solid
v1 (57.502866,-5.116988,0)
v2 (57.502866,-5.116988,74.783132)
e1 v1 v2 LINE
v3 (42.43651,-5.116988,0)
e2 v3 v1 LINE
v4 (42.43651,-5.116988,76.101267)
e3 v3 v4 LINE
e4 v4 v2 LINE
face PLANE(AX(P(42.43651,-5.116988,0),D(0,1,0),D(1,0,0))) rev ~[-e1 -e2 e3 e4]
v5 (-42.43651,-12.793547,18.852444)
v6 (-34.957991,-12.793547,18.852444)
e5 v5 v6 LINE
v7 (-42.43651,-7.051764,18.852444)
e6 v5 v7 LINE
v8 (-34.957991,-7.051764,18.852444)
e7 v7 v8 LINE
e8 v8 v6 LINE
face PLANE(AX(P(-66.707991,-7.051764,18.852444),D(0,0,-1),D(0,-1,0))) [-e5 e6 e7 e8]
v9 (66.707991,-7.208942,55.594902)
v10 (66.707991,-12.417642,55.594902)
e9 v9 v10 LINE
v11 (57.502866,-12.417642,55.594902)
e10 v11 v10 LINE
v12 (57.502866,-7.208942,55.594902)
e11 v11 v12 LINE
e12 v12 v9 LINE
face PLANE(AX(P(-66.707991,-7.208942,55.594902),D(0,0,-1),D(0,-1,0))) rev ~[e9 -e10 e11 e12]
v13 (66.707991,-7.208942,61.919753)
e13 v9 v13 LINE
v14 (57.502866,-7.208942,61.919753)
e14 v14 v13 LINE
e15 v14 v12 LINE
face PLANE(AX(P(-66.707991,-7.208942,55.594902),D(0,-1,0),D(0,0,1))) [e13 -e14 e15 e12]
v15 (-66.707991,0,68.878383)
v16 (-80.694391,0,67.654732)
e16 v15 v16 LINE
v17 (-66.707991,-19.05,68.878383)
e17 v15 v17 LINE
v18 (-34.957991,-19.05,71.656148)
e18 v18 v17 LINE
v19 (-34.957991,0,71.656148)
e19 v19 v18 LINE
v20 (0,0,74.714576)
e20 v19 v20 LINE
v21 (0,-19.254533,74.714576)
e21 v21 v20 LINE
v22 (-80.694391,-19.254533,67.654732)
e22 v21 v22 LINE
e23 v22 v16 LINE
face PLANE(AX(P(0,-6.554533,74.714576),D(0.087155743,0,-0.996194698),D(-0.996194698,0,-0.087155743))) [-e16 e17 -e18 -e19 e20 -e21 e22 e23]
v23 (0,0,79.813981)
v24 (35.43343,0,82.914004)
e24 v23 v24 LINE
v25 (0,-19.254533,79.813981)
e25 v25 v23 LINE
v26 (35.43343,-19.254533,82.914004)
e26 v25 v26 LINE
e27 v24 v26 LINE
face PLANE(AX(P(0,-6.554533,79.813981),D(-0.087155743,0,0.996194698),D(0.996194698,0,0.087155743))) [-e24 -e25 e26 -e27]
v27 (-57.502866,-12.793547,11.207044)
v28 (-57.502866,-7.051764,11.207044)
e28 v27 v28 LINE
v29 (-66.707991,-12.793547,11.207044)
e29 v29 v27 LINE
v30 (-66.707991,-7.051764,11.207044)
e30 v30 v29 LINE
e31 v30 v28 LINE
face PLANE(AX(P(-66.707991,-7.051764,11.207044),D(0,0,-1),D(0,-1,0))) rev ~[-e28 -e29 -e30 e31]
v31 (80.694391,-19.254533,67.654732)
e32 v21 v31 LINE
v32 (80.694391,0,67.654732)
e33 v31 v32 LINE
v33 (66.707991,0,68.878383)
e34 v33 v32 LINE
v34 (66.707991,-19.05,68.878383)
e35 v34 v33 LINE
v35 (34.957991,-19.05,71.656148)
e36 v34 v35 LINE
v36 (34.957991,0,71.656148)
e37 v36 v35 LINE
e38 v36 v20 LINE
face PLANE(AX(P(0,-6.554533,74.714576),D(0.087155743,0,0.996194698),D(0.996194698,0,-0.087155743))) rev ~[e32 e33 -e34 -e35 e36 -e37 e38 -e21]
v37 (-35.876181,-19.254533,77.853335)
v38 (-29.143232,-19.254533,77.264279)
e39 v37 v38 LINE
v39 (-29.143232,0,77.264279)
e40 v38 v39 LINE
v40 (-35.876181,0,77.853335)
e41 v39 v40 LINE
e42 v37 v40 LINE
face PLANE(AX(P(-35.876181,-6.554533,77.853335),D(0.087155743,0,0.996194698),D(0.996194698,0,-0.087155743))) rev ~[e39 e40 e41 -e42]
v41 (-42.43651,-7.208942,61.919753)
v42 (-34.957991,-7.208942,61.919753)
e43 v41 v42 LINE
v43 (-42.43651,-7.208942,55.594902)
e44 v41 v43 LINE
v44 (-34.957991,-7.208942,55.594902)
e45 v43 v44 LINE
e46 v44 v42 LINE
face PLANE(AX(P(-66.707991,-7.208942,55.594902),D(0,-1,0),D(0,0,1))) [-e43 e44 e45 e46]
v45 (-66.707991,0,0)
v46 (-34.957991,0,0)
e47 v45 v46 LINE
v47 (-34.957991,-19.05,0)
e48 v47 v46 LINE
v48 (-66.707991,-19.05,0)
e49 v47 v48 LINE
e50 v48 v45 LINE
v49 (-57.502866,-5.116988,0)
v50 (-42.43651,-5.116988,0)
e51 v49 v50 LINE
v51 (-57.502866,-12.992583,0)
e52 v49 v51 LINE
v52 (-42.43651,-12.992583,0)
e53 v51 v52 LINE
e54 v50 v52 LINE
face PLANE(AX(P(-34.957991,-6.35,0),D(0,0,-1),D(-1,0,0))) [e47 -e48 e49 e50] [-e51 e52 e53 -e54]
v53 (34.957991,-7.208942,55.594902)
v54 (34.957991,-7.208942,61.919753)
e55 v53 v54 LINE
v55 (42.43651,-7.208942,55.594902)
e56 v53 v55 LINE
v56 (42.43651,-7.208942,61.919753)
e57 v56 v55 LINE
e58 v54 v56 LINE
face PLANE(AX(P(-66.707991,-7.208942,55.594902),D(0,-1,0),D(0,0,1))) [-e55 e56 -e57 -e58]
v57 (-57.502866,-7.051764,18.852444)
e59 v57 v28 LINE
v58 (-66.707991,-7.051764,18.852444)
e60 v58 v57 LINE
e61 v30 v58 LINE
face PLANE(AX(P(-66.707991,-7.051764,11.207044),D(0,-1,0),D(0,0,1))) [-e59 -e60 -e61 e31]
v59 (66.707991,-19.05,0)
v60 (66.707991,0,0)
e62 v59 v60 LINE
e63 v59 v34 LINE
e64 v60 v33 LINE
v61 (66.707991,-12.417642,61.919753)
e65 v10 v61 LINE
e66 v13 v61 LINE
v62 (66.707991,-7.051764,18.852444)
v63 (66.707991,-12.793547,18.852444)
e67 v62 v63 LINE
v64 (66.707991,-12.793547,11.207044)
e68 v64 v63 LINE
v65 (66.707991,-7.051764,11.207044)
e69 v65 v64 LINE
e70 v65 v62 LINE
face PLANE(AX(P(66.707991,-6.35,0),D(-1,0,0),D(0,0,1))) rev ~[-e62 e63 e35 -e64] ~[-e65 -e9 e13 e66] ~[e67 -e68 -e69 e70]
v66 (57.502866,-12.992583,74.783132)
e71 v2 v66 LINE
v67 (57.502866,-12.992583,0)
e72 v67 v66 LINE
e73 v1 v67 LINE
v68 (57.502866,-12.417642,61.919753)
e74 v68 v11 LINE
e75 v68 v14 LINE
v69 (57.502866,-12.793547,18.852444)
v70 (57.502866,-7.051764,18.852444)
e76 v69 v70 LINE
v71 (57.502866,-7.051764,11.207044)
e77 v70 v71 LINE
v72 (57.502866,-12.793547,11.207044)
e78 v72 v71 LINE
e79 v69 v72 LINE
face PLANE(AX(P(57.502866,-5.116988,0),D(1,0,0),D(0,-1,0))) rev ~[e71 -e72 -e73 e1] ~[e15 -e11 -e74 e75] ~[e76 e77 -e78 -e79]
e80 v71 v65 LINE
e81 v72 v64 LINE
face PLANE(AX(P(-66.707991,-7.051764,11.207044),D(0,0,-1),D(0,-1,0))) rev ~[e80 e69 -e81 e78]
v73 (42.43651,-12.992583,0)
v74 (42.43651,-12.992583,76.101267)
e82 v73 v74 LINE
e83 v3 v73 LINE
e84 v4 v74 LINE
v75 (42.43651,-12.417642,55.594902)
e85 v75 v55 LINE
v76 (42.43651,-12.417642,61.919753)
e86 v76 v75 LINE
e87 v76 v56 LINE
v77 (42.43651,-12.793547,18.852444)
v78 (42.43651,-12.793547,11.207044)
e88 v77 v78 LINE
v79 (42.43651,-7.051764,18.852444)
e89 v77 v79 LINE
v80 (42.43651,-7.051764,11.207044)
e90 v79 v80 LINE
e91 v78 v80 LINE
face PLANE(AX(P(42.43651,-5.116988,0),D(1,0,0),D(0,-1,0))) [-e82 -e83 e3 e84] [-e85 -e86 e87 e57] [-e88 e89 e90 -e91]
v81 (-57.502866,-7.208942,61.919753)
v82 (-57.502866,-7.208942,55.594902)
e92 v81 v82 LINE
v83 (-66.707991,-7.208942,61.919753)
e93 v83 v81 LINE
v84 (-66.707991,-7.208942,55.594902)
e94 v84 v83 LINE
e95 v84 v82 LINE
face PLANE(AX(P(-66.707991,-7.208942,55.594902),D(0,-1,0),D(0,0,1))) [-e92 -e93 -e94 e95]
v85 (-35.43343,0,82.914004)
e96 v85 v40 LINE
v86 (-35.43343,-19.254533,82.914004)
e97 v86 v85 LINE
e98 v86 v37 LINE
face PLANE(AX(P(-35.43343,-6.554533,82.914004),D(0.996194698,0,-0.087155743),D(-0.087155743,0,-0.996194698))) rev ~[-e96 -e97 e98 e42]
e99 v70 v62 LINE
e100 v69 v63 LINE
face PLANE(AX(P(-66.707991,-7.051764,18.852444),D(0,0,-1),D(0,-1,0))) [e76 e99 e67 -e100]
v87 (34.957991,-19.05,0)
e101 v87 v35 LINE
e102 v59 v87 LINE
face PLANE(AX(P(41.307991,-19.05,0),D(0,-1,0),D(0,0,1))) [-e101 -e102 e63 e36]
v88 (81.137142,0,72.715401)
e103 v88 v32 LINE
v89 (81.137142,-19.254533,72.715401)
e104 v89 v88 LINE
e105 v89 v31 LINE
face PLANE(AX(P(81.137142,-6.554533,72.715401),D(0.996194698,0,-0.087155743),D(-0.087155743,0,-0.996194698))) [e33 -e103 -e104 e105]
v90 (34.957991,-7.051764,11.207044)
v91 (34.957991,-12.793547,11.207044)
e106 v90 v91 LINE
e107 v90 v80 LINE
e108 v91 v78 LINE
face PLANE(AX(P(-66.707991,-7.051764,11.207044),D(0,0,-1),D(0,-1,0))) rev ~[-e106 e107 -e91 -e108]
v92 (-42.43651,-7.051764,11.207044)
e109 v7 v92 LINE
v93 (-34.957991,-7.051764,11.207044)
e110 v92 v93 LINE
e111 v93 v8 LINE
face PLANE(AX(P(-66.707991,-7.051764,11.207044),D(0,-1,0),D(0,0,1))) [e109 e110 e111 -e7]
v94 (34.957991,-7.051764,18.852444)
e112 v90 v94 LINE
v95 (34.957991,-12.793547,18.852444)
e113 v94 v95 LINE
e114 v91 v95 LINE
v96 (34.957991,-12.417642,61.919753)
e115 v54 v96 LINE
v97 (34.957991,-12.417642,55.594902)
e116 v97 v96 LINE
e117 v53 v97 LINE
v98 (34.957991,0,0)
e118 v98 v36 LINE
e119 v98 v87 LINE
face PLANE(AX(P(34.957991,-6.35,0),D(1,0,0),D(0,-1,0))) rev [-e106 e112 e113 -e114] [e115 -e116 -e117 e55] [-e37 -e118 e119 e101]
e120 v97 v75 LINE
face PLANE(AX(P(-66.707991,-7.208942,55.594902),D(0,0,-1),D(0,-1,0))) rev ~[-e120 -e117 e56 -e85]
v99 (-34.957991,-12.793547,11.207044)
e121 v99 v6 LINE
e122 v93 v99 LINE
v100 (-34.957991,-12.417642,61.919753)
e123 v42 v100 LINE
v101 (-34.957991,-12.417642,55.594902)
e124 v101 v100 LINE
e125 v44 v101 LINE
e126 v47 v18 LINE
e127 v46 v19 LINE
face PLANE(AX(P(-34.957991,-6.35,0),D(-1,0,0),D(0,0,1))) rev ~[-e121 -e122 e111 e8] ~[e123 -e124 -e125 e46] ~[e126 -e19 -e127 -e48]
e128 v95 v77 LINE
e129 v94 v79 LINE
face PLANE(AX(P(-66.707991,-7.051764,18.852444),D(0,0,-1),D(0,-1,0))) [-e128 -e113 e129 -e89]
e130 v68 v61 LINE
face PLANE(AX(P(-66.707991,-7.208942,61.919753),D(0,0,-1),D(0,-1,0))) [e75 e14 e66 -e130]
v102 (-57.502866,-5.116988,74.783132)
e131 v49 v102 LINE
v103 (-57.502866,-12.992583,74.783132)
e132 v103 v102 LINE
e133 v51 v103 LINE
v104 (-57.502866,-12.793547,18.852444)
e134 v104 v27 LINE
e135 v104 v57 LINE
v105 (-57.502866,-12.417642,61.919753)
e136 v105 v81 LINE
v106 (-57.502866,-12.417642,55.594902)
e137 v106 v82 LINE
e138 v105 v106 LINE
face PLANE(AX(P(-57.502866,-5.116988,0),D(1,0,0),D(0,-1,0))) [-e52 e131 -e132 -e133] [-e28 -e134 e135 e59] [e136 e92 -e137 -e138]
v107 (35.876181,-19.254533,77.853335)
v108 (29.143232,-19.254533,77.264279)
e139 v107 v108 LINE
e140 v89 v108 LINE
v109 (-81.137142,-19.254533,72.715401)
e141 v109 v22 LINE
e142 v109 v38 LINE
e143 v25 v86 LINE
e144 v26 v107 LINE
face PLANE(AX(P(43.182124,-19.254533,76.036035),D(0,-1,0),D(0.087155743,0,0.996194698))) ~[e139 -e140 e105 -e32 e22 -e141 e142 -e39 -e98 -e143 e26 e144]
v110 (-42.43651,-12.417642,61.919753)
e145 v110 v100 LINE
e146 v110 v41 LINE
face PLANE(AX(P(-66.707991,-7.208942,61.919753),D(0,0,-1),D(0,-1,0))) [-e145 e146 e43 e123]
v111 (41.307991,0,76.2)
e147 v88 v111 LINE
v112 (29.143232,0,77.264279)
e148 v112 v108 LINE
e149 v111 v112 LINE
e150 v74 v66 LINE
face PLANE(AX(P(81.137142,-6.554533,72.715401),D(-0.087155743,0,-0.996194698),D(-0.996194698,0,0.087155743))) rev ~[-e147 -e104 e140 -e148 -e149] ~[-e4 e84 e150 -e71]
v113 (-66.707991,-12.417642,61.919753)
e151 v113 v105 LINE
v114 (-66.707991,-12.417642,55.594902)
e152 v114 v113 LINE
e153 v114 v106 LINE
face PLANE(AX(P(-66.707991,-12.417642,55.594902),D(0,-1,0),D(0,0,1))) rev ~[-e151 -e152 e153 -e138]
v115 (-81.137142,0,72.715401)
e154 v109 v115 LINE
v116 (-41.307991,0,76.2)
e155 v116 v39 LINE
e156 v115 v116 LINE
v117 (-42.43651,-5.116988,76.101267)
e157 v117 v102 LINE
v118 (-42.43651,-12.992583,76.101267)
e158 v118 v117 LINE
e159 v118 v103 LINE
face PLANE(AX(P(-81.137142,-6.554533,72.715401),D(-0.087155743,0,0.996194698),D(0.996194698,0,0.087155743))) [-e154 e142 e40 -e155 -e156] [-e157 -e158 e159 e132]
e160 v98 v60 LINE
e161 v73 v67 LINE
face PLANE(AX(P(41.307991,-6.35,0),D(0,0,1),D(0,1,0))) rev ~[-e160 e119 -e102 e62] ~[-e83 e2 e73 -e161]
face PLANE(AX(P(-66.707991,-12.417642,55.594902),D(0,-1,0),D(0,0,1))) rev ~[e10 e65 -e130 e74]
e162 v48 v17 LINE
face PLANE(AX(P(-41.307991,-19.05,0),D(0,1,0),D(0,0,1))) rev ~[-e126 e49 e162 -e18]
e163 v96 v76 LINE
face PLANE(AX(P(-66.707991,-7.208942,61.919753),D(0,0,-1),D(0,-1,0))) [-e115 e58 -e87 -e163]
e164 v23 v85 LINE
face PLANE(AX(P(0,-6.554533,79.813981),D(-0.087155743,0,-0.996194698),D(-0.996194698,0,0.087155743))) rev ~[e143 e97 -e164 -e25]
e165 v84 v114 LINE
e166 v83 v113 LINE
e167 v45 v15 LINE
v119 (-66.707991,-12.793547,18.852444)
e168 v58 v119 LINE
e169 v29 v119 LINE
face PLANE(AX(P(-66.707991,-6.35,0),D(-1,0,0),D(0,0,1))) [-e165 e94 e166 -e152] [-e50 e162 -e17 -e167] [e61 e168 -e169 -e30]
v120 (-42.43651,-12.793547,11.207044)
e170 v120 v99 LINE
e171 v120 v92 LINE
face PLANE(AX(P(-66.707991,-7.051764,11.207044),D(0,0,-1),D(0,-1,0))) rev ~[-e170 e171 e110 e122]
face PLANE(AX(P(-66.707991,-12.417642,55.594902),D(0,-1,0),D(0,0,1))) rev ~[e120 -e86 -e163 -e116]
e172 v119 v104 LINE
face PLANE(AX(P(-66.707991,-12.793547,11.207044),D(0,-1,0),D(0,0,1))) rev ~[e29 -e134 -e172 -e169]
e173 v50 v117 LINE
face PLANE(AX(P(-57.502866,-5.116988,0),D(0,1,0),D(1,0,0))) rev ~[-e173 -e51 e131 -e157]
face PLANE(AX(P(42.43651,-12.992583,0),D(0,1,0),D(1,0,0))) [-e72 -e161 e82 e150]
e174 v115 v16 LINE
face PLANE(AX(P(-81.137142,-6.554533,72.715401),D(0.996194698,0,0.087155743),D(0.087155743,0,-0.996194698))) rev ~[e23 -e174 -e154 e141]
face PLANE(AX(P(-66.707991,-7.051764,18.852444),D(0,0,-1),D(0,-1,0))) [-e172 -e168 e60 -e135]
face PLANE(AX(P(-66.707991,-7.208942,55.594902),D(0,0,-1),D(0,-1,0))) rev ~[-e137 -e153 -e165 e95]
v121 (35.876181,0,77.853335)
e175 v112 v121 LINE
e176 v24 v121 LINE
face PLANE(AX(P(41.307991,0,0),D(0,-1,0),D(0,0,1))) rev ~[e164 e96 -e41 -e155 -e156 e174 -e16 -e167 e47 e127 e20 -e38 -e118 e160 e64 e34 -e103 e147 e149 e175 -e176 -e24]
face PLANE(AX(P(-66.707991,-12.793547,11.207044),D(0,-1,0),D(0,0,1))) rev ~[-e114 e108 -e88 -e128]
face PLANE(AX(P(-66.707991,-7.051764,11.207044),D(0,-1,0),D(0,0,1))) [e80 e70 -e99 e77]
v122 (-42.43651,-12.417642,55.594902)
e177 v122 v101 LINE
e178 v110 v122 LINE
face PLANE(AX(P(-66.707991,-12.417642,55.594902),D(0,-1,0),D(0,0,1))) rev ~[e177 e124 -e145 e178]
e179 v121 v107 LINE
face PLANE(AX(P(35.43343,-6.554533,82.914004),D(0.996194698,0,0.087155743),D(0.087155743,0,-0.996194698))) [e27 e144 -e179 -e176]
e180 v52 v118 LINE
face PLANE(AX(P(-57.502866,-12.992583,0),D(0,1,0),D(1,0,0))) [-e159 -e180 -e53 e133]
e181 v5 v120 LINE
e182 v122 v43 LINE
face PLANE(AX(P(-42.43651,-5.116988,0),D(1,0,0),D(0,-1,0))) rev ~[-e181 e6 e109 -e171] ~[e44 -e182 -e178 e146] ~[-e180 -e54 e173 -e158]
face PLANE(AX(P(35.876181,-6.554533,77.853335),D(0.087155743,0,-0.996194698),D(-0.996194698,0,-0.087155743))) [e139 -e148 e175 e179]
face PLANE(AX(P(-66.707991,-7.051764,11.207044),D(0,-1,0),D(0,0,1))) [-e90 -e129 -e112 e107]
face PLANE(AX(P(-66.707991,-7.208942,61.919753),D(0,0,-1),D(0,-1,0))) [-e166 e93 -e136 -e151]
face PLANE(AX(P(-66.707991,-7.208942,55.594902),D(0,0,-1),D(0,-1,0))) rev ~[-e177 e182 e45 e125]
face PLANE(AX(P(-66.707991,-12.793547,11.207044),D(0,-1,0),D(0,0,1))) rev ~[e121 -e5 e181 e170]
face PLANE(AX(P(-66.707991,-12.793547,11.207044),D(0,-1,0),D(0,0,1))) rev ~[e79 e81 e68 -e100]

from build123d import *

# Parameters (mm, degrees)
F0_W      = 6.35
F0_H      = 6.35
F1_DEPTH  = 76.2
F3_W      = 78.9158530533
F3_H      = 6.5545327961
F4_DEPTH  = 5.08
F5_DEPTH  = 38.1
F7_DEPTH  = 25.4
F8_DEPTH  = 25.4
F9_DEPTH  = 12.7
F10_DEPTH = 12.7
F11_W     = 15.0663554668
F11_H     = 7.8755952418
F12_DEPTH = 88.9
F13_W     = 5.7417834178
F13_H     = 7.6454
F14_DEPTH = 2540
F15_W     = 5.208699964
F15_H     = 6.3248500228
F16_DEPTH = 25400


# Not quite as in the source:
# - a feature names something its author has since deleted; it is built from what else it names


with BuildPart() as f1:
    # F0 (on Top) → F1 (new body)
    with BuildSketch(Plane.XY):
        with Locations((-38.1329911691, -3.175)):
            Rectangle(F0_W, F0_H)
    extrude(amount=F1_DEPTH)

    # F3 (on face) → F4 (join)
    with BuildSketch(Plane(origin=(-6.9297761713, 0, 79.2077040846), x_dir=(0.9961946981, 0, 0.0871557427), z_dir=(0.0871557427, 0, -0.9961946981))):
        with Locations((3.0671004206, 3.2772663981)):
            Rectangle(F3_W, F3_H)
    extrude(amount=F4_DEPTH)

    # F5 (add): a face of the model
    f5_faces = [f1.faces().sort_by_distance(p)[0] for p in [
        (-42.9607486108, -3.2772663981, 73.5057000729),
    ]]
    extrude(f5_faces, amount=F5_DEPTH)

    # F6: F1 across plane


with BuildPart() as f1_1:
    add(f1.part)
    add(f1.part.mirror(Plane.YZ))

    # F7 (add): a face of the model
    f7_faces = [f1_1.faces().sort_by_distance(p)[0] for p in [
        (-41.3079911691, -3.175, 35.5502976126),
    ]]
    extrude(f7_faces, amount=F7_DEPTH)

    # F8 (add): a face of the model
    f8_faces = [f1_1.faces().sort_by_distance(p)[0] for p in [
        (41.3079911691, -3.175, 35.5502976126),
    ]]
    extrude(f8_faces, amount=F8_DEPTH)

    # F9 (add): a face of the model
    f9_faces = [f1_1.faces().sort_by_distance(p)[0] for p in [
        (0, -6.5545327961, 75.0015171841),
    ]]
    extrude(f9_faces, amount=F9_DEPTH)

    # F10 (add): faces of the model
    f10_faces = [f1_1.faces().sort_by_distance(p)[0] for p in [
        (-50.72839761, -6.35, 35.1382082279),
        (50.72839761, -6.35, 35.1382082279),
    ]]
    extrude(f10_faces, amount=F10_DEPTH)

    # F11 (on face) → F12 (cut)
    with BuildSketch(Plane(origin=(0, 0, 0), x_dir=(1, 0, 0), z_dir=(0, 0, -1))):
        with Locations((-49.9696880579, 9.0547855943)):
            Rectangle(F11_W, F11_H)
        with Locations((49.9696880579, 9.0547855943)):
            Rectangle(F11_W, F11_H)
    extrude(amount=-F12_DEPTH, mode=Mode.SUBTRACT)

    # F13 (on face) → F14 (cut)
    with BuildSketch(Plane(origin=(-66.7079911691, 0, 0), x_dir=(0, -1, 0), z_dir=(-1, 0, 0))):
        with Locations((9.922655765, 15.0297441246)):
            Rectangle(F13_W, F13_H)
    extrude(amount=-F14_DEPTH, mode=Mode.SUBTRACT)

    # F15 (on face) → F16 (cut)
    with BuildSketch(Plane(origin=(-66.7079911691, 0, 0), x_dir=(0, -1, 0), z_dir=(-1, 0, 0))):
        with Locations((9.8132924177, 58.757327497)):
            Rectangle(F15_W, F15_H)
    extrude(amount=-F16_DEPTH, mode=Mode.SUBTRACT)


solid = f1_1.part
